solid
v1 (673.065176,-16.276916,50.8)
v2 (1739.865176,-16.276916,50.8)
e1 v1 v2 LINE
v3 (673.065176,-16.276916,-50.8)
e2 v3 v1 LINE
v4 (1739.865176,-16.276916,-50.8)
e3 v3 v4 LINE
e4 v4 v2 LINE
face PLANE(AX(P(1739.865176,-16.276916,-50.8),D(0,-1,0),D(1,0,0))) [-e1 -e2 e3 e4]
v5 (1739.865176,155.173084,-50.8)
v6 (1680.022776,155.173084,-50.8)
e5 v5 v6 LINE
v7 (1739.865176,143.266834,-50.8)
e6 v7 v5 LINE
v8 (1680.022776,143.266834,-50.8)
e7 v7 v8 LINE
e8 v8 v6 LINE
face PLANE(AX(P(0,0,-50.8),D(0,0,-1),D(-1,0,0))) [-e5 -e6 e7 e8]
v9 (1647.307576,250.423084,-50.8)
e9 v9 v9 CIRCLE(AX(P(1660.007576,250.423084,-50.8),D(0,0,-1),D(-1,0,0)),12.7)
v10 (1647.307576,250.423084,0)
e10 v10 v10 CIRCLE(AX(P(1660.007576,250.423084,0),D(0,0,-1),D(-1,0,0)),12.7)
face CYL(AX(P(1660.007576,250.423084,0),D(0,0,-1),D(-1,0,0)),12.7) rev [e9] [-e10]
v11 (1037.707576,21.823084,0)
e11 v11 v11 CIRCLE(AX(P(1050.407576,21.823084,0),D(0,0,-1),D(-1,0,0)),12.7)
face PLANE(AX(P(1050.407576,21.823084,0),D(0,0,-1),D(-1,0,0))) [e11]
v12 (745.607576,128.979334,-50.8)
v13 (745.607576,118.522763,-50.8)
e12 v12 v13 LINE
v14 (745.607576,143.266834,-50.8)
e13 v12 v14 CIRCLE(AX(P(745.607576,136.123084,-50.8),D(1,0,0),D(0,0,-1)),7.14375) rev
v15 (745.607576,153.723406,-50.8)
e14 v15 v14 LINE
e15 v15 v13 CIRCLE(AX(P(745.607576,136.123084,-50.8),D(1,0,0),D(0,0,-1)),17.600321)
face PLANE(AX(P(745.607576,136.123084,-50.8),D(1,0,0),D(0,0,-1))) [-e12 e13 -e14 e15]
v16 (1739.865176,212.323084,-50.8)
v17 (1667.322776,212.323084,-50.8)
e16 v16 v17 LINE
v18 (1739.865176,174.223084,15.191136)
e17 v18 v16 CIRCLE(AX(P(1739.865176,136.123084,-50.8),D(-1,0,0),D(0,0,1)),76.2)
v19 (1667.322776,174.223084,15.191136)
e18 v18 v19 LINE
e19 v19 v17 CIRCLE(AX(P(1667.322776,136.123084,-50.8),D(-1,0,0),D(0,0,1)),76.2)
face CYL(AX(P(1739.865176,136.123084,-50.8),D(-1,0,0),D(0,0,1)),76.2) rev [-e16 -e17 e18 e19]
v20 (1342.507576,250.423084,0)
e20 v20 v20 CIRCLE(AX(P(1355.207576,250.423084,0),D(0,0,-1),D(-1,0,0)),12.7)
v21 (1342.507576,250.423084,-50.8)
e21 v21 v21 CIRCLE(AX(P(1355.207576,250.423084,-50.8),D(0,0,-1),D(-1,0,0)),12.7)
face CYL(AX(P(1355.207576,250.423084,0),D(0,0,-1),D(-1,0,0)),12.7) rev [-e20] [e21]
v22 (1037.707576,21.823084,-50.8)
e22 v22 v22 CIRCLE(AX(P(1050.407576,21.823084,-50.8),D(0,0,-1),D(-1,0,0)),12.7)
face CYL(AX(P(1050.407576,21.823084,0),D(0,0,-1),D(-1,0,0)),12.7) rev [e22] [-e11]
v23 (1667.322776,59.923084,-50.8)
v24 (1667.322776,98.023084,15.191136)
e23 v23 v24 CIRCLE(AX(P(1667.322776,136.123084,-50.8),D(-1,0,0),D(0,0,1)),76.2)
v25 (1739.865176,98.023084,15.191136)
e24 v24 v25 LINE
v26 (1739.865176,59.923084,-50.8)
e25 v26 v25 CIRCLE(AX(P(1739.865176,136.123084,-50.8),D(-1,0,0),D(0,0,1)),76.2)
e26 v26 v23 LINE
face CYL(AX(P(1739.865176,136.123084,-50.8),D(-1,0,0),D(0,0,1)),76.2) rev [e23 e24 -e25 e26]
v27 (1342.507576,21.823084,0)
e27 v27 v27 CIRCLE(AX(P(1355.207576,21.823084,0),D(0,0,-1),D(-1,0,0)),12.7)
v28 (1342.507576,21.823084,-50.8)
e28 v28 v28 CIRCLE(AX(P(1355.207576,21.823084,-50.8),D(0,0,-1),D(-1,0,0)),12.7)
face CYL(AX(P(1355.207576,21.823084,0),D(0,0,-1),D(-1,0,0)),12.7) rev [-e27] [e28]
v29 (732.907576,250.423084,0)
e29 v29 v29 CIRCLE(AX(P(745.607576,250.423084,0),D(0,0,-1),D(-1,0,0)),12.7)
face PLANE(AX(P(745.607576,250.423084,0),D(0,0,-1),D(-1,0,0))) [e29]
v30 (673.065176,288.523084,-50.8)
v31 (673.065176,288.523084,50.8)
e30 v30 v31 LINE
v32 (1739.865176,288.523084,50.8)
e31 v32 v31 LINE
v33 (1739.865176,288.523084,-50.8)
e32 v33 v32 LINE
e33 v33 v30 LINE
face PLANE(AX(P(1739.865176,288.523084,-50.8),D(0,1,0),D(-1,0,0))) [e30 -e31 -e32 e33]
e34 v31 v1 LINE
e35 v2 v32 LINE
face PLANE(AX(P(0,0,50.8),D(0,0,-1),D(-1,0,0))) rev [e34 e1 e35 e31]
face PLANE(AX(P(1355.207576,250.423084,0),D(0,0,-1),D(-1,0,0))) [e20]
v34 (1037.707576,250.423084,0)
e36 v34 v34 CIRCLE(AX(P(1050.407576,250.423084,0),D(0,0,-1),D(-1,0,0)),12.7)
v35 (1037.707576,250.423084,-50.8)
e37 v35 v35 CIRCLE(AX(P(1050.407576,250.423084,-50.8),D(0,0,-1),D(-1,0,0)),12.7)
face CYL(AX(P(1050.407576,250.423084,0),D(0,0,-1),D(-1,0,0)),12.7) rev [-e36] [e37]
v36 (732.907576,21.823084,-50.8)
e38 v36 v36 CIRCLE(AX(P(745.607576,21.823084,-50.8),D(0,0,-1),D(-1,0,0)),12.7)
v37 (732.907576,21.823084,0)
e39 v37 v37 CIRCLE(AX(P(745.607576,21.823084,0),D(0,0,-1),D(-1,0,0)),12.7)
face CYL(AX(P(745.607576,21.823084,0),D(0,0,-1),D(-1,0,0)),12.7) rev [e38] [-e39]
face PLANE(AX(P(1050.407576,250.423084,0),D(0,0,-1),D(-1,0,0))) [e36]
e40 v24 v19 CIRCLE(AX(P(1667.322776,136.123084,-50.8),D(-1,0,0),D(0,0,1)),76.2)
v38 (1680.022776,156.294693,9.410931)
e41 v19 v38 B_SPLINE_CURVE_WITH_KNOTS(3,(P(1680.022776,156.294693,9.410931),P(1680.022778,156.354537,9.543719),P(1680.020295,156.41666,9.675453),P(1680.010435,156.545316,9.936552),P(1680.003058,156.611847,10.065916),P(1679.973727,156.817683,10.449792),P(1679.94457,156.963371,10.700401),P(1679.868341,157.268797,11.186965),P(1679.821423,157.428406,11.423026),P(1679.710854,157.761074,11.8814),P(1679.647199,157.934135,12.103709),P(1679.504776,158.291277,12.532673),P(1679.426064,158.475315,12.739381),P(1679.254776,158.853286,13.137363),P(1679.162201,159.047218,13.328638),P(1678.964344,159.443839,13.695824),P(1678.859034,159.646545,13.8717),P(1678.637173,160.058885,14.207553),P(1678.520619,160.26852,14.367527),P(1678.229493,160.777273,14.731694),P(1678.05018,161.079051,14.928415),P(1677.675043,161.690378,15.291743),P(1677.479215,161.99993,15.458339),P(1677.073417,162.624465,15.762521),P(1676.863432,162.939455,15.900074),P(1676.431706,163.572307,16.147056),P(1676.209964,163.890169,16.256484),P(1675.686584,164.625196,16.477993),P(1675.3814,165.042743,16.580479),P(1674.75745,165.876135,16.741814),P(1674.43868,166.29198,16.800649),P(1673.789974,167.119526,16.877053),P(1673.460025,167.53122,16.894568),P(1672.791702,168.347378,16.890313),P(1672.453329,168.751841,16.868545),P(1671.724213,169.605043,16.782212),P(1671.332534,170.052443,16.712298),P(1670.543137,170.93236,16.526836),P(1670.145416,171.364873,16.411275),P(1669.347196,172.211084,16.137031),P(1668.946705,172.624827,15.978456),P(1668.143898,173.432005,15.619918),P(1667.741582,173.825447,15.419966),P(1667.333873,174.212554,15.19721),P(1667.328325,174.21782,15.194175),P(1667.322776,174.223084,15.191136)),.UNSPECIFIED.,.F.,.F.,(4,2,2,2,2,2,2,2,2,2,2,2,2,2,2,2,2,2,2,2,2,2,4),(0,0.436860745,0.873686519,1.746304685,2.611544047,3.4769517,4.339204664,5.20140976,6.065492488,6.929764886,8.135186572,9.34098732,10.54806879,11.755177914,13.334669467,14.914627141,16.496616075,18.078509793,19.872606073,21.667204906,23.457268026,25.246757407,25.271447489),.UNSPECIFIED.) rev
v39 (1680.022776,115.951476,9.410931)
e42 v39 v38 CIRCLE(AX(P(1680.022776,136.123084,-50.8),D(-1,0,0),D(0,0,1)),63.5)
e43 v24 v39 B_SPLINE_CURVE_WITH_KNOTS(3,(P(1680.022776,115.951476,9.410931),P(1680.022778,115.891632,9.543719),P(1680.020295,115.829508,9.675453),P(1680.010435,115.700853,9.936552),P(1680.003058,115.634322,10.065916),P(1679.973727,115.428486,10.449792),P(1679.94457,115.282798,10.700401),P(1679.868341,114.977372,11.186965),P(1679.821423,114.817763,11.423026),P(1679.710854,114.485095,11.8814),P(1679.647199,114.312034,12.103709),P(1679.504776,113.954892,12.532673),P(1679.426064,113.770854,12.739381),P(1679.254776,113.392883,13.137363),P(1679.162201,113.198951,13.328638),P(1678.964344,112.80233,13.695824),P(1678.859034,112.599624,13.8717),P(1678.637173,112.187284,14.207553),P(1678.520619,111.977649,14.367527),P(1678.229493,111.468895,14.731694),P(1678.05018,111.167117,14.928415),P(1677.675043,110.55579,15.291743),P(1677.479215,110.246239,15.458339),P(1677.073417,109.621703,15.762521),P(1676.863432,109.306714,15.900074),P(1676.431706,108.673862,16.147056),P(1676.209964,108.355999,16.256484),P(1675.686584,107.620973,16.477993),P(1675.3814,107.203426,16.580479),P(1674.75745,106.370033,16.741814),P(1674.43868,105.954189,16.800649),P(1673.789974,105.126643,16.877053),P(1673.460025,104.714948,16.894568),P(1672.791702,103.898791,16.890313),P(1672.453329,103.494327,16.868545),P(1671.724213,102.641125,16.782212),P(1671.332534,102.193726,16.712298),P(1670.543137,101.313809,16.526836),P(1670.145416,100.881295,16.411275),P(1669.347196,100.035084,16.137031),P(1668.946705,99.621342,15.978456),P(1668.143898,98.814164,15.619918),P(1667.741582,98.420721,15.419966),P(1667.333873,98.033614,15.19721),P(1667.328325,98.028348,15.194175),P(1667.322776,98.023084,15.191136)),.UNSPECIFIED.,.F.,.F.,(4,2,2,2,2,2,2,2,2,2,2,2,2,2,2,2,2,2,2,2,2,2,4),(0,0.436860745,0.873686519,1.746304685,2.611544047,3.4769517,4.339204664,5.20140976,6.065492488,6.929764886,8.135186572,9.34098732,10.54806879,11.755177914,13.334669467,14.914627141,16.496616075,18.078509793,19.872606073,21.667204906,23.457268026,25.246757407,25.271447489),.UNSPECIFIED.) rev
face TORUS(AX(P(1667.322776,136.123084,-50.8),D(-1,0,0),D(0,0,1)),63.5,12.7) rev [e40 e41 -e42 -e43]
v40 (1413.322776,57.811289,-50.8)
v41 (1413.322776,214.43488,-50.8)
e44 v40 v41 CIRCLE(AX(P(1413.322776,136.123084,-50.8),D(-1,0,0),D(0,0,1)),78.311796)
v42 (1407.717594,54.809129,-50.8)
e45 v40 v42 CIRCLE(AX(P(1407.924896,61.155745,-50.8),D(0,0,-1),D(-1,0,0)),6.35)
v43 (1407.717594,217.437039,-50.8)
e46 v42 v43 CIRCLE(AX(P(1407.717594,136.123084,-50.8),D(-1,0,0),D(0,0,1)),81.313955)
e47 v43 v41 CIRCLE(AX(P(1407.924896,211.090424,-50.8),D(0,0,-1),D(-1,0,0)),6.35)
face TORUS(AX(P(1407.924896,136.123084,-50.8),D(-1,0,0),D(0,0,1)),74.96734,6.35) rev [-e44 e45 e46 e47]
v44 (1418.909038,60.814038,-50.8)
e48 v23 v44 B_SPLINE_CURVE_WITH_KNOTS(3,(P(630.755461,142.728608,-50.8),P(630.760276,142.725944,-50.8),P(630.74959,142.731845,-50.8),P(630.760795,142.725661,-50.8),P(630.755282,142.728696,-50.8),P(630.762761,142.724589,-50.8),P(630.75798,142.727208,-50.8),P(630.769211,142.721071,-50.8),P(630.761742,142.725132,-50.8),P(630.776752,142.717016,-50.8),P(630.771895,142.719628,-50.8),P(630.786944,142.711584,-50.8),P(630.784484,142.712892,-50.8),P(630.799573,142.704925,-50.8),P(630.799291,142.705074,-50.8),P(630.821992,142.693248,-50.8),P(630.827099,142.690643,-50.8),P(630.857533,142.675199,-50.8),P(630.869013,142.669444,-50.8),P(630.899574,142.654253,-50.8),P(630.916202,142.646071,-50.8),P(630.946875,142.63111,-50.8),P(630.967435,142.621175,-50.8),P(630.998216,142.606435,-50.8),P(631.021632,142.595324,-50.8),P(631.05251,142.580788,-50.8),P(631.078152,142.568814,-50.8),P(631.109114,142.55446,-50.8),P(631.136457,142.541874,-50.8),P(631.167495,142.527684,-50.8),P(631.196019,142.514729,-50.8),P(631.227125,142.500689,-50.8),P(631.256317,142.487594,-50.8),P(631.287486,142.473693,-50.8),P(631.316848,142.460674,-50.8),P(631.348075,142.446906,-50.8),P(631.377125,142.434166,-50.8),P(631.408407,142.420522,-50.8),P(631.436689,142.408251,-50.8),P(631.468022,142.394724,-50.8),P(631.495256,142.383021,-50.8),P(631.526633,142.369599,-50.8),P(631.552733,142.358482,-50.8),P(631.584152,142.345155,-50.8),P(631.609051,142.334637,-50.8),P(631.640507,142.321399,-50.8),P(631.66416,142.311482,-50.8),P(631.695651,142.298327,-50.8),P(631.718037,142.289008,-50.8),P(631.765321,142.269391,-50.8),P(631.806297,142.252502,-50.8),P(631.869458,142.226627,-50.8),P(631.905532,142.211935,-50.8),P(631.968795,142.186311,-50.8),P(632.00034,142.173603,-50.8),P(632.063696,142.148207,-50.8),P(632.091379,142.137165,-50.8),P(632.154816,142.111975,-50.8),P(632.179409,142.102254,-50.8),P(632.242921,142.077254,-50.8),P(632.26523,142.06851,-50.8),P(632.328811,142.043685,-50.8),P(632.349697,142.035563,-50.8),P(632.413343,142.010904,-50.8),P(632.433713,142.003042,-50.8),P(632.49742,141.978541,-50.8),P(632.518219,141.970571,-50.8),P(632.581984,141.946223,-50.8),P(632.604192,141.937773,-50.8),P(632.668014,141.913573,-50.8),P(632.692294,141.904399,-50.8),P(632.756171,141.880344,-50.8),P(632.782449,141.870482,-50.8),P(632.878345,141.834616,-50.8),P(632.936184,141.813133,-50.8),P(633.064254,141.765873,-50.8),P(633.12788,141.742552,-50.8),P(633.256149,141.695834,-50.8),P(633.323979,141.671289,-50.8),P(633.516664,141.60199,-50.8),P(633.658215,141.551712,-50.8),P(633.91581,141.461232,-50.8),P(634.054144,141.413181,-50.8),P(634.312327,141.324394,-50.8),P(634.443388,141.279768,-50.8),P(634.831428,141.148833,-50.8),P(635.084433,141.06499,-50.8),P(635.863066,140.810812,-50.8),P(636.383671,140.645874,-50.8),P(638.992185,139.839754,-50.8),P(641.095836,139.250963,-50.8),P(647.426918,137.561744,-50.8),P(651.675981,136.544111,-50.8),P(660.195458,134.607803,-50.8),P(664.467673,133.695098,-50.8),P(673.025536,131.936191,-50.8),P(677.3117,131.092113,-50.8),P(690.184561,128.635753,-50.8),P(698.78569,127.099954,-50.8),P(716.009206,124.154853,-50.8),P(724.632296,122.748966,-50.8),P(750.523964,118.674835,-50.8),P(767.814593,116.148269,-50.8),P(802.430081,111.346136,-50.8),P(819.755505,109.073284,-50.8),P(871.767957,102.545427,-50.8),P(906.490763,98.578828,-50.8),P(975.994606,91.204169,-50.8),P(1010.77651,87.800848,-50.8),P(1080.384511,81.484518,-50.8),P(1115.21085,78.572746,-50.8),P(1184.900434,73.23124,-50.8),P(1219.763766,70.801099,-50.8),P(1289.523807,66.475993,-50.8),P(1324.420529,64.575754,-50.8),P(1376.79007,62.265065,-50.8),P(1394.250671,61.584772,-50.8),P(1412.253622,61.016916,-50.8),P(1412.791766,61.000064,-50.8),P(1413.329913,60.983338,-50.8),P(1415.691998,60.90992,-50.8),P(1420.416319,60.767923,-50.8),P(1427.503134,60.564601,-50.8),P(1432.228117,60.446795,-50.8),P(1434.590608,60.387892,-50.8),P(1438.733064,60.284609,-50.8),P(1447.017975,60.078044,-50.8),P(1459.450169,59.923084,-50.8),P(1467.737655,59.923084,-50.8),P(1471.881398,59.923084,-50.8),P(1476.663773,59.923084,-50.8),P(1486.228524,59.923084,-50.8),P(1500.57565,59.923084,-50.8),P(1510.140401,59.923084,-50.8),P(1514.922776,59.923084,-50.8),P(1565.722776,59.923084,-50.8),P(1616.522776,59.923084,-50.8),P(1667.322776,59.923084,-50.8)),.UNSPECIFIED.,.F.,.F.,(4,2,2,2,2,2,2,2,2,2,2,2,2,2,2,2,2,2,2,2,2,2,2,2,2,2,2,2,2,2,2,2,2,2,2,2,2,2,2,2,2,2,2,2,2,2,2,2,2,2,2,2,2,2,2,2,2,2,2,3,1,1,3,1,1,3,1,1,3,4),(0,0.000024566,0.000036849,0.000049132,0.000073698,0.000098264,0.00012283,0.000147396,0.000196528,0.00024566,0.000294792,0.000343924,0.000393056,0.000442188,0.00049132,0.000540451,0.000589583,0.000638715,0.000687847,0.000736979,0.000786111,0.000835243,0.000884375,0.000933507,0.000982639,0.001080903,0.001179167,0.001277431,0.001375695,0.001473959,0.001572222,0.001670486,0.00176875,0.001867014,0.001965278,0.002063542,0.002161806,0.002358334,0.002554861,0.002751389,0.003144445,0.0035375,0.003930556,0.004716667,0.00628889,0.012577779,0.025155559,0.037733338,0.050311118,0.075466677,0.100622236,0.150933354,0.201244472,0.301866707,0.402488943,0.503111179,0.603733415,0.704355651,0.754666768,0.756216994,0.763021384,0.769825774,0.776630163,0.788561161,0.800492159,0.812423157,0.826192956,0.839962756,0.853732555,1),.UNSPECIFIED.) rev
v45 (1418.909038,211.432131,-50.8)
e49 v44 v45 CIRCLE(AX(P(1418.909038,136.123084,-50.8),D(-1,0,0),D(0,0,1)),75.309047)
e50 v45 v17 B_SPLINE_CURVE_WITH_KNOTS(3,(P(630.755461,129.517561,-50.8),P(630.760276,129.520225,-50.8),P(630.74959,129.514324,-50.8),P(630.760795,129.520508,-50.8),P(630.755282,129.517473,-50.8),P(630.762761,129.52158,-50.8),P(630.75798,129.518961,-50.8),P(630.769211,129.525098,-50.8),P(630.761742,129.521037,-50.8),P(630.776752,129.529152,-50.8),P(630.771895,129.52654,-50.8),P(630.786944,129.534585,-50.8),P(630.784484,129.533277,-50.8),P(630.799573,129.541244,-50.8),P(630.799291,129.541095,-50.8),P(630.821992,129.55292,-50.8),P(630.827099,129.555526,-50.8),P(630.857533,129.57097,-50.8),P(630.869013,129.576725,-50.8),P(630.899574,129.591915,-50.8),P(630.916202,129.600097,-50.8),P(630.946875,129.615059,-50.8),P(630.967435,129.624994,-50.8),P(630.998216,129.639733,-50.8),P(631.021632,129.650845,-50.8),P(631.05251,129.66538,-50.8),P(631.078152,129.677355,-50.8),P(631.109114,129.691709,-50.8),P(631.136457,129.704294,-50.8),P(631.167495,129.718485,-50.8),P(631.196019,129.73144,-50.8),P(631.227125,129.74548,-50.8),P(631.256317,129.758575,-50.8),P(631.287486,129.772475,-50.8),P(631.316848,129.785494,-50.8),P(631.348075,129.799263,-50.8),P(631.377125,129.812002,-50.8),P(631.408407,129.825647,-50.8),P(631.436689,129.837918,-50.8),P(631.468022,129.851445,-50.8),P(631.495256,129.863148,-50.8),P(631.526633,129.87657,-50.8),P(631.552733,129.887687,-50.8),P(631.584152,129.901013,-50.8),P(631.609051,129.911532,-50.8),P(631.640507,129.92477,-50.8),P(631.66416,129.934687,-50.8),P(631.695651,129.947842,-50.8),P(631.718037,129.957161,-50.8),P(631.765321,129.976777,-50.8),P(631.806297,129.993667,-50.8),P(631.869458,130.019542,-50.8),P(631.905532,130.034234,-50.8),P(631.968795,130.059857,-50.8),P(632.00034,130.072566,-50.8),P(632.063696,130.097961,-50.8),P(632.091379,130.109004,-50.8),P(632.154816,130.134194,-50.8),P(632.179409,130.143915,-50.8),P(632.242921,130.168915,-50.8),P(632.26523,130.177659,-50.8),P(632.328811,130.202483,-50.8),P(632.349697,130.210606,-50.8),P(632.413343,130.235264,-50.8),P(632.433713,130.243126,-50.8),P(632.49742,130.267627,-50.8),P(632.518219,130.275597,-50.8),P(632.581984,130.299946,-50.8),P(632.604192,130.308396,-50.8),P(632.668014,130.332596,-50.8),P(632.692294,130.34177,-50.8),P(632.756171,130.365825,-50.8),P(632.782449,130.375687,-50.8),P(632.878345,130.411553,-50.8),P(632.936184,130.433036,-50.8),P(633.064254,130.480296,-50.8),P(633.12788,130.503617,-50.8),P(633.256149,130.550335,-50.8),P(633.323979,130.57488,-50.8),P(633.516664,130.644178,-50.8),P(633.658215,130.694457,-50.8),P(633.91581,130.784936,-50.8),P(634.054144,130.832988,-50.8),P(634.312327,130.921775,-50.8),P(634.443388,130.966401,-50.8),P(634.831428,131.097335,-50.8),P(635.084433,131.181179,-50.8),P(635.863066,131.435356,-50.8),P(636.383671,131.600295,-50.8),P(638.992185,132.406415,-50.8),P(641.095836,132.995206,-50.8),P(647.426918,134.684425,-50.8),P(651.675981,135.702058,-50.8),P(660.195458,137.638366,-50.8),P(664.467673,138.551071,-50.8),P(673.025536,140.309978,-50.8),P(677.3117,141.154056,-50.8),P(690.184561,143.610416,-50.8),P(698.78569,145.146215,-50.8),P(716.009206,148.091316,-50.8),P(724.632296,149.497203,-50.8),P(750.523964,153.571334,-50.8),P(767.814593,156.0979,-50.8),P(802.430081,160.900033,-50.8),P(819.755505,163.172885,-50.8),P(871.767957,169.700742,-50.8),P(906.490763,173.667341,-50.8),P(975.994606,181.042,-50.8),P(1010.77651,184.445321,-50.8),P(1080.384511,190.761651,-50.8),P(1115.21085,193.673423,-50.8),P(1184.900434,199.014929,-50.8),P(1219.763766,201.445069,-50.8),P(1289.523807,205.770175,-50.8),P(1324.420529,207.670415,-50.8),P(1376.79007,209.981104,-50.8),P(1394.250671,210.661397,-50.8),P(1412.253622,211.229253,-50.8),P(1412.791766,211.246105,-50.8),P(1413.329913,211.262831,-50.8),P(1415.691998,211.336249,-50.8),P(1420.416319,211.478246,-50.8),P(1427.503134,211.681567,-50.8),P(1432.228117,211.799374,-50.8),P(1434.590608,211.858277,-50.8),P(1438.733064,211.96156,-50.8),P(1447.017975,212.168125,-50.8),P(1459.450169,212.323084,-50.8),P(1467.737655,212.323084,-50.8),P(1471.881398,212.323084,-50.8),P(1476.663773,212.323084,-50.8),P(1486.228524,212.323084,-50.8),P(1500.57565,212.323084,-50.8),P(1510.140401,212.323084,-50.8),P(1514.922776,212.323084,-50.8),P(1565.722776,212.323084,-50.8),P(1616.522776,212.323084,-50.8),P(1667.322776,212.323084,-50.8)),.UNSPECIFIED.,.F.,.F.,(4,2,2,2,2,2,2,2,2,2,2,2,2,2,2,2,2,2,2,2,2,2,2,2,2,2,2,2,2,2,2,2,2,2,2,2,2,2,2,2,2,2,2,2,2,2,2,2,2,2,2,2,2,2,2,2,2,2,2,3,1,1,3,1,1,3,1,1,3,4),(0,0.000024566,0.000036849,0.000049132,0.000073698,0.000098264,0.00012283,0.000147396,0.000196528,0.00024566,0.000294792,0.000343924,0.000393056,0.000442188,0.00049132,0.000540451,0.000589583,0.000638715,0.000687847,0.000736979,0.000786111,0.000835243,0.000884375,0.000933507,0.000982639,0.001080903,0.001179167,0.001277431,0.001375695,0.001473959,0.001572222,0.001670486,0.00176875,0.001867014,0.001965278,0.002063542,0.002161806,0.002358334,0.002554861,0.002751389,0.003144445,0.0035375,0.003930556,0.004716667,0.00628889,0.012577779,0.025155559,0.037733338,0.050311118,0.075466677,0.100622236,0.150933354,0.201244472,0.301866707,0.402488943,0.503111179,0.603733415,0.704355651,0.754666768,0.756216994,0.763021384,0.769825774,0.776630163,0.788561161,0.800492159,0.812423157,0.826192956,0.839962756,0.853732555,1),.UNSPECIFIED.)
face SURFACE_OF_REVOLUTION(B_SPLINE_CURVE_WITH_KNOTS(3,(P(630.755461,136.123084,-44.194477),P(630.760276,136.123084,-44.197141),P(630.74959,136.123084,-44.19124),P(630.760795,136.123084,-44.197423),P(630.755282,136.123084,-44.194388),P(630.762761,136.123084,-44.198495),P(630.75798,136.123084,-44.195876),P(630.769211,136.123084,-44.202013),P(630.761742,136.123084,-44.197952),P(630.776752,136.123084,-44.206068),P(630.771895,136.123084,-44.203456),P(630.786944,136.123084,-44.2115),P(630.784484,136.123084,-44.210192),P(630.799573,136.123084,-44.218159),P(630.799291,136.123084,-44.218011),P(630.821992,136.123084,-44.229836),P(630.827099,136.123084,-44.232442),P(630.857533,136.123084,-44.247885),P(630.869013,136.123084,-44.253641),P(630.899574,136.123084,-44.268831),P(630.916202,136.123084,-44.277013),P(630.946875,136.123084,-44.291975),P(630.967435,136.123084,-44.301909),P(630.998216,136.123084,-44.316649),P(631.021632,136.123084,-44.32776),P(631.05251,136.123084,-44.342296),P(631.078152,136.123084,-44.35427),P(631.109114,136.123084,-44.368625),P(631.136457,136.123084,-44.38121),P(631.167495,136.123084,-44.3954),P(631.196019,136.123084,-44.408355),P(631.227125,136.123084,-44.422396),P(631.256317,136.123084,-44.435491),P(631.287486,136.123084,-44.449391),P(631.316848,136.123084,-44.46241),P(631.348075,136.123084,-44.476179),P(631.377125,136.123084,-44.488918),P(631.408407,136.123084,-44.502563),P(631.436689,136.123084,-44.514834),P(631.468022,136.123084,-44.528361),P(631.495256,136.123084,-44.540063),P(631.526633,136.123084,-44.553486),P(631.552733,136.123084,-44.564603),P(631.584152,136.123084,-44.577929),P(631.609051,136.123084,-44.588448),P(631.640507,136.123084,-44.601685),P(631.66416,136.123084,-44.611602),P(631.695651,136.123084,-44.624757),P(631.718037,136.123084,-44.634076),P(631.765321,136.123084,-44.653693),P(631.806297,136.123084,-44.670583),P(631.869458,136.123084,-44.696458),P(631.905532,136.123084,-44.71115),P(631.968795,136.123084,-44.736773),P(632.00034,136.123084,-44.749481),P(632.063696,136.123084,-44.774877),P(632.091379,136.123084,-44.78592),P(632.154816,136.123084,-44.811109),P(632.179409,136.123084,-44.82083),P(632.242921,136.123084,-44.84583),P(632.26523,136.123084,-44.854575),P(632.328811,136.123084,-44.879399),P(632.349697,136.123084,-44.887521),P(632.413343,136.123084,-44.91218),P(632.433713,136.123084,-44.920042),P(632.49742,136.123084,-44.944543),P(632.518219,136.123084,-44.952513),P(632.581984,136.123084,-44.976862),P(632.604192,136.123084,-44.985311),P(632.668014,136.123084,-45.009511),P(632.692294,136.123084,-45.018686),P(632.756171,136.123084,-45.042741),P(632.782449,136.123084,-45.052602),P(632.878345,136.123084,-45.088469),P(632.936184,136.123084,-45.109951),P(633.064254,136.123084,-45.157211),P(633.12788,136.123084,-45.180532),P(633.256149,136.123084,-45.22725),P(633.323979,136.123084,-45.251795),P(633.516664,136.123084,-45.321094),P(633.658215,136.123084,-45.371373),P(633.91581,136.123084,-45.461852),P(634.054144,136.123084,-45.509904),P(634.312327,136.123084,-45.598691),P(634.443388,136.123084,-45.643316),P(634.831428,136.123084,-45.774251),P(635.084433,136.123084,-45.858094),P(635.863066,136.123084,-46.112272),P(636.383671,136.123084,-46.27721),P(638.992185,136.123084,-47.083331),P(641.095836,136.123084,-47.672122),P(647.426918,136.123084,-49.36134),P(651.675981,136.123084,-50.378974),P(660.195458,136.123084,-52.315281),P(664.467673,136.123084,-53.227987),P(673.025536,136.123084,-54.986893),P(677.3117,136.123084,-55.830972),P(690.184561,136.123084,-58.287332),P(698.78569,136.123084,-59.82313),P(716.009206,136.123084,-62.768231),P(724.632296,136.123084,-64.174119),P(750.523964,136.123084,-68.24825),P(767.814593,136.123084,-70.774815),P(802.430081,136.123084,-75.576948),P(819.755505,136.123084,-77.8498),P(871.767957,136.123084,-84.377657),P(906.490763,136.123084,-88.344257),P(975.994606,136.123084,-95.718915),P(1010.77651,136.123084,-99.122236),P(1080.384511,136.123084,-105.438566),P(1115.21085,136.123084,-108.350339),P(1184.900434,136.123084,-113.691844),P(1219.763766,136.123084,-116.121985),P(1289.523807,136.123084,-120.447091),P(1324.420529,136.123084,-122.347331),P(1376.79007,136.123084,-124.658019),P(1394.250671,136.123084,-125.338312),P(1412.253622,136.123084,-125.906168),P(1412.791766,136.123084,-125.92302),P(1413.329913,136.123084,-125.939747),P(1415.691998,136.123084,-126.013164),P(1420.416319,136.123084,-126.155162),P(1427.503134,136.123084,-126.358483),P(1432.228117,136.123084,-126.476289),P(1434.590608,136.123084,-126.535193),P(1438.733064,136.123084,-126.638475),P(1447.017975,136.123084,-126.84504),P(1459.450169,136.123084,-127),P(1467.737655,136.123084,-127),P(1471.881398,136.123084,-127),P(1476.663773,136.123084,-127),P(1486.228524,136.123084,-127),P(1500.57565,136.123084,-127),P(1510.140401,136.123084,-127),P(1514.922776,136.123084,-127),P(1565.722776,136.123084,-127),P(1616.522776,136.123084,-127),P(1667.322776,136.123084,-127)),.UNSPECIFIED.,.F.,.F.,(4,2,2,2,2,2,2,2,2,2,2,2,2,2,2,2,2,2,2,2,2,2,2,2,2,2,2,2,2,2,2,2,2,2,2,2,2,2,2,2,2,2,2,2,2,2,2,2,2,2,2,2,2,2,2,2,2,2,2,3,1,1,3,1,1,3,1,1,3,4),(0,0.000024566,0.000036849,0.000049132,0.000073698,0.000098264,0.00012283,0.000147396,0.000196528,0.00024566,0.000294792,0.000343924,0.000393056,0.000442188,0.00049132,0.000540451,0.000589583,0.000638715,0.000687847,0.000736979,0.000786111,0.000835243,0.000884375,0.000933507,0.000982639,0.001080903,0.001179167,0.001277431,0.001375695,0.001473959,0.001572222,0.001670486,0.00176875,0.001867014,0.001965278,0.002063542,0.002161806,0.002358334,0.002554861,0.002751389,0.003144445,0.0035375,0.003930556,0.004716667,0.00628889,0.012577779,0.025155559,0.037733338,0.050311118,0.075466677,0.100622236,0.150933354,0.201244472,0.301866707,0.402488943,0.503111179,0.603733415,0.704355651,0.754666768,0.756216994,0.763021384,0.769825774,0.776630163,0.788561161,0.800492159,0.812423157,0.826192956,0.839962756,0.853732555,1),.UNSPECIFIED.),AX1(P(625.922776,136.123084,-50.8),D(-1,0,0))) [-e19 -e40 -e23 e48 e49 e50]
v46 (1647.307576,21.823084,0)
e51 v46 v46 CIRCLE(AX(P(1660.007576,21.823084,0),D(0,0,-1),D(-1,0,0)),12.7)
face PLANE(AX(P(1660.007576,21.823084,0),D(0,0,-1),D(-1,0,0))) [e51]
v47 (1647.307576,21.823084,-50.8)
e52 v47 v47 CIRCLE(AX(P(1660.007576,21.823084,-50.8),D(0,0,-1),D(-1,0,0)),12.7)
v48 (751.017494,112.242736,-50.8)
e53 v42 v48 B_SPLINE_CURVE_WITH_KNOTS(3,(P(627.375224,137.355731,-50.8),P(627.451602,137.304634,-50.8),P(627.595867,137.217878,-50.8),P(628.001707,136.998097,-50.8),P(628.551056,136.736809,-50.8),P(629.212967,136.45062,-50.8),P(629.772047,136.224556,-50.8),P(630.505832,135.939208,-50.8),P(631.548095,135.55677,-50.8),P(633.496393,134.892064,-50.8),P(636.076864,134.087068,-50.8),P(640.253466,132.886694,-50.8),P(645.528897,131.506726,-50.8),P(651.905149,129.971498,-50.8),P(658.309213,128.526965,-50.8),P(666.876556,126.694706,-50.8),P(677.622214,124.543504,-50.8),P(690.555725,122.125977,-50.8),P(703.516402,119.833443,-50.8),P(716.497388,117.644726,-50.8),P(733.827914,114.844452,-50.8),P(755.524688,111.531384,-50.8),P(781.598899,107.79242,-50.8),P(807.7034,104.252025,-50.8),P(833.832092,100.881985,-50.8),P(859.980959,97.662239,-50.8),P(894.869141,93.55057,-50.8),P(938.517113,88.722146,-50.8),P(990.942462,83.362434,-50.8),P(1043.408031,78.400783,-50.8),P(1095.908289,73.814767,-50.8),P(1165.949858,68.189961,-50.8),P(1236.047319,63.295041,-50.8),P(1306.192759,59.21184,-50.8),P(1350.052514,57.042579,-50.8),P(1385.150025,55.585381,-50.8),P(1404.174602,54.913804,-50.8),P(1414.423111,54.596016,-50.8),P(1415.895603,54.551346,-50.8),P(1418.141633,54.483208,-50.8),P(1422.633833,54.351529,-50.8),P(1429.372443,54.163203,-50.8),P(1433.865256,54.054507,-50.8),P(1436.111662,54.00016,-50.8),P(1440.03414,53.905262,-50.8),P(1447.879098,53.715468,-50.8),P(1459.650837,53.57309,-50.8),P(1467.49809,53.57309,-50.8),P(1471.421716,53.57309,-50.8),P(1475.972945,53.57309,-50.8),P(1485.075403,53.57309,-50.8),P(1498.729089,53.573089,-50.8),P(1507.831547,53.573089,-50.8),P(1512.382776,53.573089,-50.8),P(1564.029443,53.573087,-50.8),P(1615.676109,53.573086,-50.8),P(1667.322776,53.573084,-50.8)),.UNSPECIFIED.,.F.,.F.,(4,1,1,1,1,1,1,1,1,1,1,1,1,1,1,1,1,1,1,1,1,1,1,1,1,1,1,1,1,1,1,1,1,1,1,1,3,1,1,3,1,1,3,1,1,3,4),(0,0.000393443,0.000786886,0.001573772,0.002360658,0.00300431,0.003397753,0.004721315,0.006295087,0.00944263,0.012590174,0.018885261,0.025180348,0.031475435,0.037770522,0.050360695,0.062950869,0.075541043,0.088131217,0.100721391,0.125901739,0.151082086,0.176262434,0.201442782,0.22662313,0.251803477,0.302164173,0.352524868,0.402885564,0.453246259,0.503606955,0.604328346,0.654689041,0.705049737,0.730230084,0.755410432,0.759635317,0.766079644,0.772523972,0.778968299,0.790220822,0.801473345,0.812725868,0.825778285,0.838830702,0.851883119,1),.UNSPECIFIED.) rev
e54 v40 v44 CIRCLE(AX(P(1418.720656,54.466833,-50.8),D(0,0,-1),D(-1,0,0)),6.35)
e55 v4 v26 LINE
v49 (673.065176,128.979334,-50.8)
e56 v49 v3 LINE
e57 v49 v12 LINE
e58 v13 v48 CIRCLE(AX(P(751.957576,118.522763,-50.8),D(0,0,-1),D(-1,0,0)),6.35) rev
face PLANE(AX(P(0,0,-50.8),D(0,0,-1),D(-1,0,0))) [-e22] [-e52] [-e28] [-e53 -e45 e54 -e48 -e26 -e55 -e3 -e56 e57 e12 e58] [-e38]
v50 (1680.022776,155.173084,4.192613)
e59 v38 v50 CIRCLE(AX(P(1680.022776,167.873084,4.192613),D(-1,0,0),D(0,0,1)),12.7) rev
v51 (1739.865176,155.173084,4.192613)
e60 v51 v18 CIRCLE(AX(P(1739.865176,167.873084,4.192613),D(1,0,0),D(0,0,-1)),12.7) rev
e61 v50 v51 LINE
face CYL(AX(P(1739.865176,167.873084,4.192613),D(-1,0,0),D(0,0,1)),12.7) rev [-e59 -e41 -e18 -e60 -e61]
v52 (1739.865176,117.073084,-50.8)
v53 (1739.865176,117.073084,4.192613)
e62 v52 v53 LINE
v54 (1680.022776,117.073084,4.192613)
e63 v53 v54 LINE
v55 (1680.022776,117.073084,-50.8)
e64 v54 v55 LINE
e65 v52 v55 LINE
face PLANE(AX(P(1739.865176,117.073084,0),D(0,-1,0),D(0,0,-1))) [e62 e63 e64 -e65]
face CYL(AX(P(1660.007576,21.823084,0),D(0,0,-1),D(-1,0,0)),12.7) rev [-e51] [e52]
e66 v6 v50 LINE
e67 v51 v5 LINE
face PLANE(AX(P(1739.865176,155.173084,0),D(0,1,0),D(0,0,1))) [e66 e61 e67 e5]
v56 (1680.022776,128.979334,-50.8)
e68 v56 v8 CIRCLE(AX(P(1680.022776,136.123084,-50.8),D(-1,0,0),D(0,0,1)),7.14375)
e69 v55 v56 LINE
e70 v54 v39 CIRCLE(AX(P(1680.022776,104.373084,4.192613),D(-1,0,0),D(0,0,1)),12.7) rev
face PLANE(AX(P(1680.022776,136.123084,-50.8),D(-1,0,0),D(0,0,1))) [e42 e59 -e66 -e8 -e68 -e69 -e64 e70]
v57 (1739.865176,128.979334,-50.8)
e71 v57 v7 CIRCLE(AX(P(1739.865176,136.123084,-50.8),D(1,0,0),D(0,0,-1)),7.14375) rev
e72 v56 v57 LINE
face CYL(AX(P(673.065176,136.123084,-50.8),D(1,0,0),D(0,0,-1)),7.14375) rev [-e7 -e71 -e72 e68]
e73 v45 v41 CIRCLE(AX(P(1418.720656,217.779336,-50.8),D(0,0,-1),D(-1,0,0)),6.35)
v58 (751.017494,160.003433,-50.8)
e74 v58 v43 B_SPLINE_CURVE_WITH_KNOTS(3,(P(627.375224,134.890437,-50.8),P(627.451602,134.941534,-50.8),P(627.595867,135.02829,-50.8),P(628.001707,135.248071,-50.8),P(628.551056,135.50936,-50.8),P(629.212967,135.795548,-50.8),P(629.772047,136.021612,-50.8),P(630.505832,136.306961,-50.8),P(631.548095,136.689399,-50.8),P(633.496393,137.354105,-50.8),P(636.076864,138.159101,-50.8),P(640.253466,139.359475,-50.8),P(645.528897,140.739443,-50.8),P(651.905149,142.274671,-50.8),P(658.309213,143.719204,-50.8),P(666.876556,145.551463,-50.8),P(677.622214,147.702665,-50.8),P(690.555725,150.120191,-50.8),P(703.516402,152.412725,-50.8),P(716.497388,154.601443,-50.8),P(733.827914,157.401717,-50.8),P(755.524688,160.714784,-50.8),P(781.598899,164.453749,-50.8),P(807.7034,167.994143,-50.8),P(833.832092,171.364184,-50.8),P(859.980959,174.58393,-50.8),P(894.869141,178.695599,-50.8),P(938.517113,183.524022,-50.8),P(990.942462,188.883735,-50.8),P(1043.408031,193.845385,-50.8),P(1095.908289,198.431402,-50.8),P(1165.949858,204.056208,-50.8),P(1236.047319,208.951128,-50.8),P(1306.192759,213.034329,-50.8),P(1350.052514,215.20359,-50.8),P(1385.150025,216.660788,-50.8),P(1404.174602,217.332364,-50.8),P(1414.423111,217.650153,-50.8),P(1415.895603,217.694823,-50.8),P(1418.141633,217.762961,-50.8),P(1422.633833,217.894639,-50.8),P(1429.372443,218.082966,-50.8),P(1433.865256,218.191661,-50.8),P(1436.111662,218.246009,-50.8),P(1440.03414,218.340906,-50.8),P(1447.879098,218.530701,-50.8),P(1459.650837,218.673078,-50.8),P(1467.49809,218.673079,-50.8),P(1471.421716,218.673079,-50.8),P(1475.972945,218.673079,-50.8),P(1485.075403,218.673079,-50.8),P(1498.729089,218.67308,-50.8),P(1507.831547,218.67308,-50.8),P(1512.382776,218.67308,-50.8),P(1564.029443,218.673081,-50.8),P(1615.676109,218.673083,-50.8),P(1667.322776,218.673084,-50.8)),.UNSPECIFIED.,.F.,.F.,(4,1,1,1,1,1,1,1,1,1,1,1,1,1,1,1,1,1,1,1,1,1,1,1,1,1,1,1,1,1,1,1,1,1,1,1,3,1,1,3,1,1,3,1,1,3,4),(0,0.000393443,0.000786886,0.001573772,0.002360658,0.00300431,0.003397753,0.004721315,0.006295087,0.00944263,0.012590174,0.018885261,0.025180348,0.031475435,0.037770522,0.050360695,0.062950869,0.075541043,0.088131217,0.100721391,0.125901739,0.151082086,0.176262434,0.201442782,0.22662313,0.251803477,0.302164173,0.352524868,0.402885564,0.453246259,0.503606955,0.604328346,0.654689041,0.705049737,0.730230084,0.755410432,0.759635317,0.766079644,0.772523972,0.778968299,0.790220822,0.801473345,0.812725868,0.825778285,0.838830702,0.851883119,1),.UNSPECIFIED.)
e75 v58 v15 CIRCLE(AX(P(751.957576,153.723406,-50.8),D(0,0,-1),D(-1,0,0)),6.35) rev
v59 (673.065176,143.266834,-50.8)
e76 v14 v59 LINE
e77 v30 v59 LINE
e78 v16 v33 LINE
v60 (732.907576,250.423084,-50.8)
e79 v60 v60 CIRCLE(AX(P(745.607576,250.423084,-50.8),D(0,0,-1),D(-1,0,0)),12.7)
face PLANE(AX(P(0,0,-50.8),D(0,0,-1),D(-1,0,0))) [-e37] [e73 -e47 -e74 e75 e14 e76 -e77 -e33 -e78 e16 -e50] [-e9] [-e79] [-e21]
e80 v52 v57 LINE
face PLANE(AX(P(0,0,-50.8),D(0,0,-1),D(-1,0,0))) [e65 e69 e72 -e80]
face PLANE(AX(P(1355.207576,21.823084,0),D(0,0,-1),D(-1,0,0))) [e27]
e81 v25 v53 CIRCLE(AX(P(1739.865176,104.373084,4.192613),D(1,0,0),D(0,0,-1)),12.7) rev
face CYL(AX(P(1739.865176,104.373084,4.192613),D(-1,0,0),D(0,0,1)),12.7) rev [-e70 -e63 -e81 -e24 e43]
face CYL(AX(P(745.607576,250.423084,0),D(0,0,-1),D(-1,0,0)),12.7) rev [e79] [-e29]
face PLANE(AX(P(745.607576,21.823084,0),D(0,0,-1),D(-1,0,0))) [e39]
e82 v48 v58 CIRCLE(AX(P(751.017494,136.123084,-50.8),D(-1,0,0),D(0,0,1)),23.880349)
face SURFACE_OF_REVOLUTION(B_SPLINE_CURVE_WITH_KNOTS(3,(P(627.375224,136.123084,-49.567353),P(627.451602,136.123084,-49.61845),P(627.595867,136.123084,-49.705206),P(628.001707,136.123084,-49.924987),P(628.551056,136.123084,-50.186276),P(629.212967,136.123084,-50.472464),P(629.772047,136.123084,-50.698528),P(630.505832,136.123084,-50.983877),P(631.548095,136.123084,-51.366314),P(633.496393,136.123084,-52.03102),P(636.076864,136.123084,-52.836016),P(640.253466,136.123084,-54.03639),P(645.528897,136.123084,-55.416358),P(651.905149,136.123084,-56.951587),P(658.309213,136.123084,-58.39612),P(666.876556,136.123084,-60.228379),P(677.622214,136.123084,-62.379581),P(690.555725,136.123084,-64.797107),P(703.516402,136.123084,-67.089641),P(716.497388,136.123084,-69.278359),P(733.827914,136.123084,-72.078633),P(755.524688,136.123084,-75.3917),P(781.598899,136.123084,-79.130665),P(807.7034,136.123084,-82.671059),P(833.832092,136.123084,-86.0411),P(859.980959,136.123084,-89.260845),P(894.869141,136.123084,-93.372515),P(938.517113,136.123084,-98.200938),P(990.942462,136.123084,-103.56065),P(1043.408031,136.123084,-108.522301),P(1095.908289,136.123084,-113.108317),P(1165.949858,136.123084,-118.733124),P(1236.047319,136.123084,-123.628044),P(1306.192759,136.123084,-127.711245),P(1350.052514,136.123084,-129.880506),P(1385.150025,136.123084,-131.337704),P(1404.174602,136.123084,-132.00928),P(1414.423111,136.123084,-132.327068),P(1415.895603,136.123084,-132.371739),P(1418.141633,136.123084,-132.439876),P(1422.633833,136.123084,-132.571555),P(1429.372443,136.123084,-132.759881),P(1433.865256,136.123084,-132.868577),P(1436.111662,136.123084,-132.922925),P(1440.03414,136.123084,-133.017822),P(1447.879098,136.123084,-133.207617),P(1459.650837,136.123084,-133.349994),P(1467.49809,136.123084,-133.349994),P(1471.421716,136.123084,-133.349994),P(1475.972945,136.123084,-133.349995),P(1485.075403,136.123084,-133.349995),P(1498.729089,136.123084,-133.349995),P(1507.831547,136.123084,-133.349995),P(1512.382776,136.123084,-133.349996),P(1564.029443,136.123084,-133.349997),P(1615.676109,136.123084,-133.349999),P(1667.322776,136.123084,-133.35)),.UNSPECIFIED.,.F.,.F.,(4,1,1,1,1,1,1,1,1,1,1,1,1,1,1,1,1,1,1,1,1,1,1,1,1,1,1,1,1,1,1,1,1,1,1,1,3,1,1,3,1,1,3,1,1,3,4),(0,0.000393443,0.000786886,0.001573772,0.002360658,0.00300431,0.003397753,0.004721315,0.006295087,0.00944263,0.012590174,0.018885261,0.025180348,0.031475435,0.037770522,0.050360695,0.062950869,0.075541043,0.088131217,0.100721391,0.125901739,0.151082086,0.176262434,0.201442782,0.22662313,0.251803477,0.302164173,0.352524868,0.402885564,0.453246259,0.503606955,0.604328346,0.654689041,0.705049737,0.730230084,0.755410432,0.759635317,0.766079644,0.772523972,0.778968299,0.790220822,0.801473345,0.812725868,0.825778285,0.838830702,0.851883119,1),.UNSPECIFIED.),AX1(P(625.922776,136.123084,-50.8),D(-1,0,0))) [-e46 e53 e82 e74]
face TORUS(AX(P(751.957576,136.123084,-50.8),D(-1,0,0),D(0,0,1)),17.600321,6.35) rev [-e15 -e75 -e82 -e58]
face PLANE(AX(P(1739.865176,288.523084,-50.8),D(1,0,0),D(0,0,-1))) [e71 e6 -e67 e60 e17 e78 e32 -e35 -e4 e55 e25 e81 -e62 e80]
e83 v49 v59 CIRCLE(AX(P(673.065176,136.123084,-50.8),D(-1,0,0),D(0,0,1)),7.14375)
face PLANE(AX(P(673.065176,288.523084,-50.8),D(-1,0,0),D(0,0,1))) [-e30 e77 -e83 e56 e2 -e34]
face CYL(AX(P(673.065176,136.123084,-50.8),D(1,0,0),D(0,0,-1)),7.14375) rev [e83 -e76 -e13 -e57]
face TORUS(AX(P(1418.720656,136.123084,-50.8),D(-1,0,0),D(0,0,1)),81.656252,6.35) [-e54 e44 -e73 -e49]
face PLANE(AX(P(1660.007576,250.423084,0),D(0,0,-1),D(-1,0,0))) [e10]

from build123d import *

# Parameters (mm, degrees)
SKETCH2_W                    = 1066.8
SKETCH2_H                    = 304.8
BOSS_EXTRUDE1_DEPTH          = 50.8
CUT_EXTRUDE1_DEPTH           = 1107.294920223
CUT_EXTRUDE1_DEPTH_BACK      = 1107.294920223
SKETCH4_R                    = 7.14375
CUT_EXTRUDE3_DEPTH           = 1037.520325732
FILLET4_R                    = 6.35
REGISTRATION_HOLE_SKETCH_R   = 12.7
BASE_REGISTRATION_HOLE_DEPTH = 50.8
LPATTERN3_COUNT              = 4
LPATTERN3_PITCH              = 304.8
LPATTERN3_COUNT_DIR2         = 2
LPATTERN3_PITCH_DIR2         = 228.6
SKETCH7_R                    = 76.2
CUT_EXTRUDE4_DEPTH           = 12.7
FILLET5_R                    = 12.7


# Read off the part's stored shape, not the designer's step: Indent1
with BuildPart() as part:
    # Sketch2 → Boss-Extrude1 (new, symmetric)
    with BuildSketch(Plane.XY):
        with Locations((1206.465176028, 136.123084384)):
            Rectangle(SKETCH2_W, SKETCH2_H)
    extrude(amount=BOSS_EXTRUDE1_DEPTH, both=True)

    # Indent1 outline → Indent1 (revolve, cut)
    with BuildSketch(Plane(origin=(0, 136.123084384, -50.8), x_dir=(0, 1, 0), z_dir=(0, 0, -1))):
        with BuildLine():
            Line((76.2, 1667.322776028), (0, 1667.322776028))
            Line((0, 1667.322776028), (0, 745.607576028))
            Line((0, 745.607576028), (23.064945381, 745.607576028))
            add(Edge.make_bspline(
                [(23.064945381, 745.607576028), (23.566825523, 748.91437787), (25.363204219, 760.90488429), (28.330664868, 781.598898763), (31.871058885, 807.703400336), (35.241099853, 833.832092117), (38.460845457, 859.980959498), (42.572514827, 894.869141414), (47.400937928, 938.517112788), (52.760650205, 990.942462001), (57.722301111, 1043.408031291), (62.308317352, 1095.908289185), (67.933123727, 1165.949858053), (72.828043506, 1236.047318759), (76.911244662, 1306.192759412), (79.080505646, 1350.052513699), (80.485669281, 1383.896744518), (81.068244998, 1400.195093482), (81.313954963, 1407.717593946)],
                knots=[0.116308657, 0.116308657, 0.116308657, 0.116308657, 0.125901739, 0.151082086, 0.176262434, 0.201442782, 0.22662313, 0.251803477, 0.302164173, 0.352524868, 0.402885564, 0.453246259, 0.503606955, 0.604328346, 0.654689041, 0.705049737, 0.730230084, 0.75181382, 0.75181382, 0.75181382, 0.75181382], degree=3))
            ThreePointArc((81.313954963, 1407.717593946), (80.564993874, 1410.923022844), (78.31179575, 1413.322776028))
            ThreePointArc((78.31179575, 1413.322776028), (76.063072477, 1415.714189378), (75.309046779, 1418.909038266))
            add(Edge.make_bspline(
                [(75.309046779, 1418.909038266), (75.323959024, 1419.411481069), (75.408519742, 1422.276130669), (75.558482998, 1427.503133809), (75.676289458, 1432.228116929), (75.735192688, 1434.590608489), (75.838475179, 1438.733064052), (76.045040161, 1447.017975177), (76.2, 1459.45016933), (76.2, 1467.737655163), (76.2, 1471.88139808), (76.2, 1476.663773407), (76.2, 1486.228524062), (76.2, 1500.575650045), (76.2, 1510.1404007), (76.2, 1514.922776028), (76.2, 1565.722776028), (76.2, 1616.522776028), (76.2, 1667.322776028)],
                knots=[0.761574077, 0.761574077, 0.761574077, 0.761574077, 0.763021384, 0.769825774, 0.776630163, 0.776630163, 0.776630163, 0.788561161, 0.800492159, 0.812423157, 0.812423157, 0.812423157, 0.826192956, 0.839962756, 0.853732555, 0.853732555, 0.853732555, 1, 1, 1, 1], degree=3))
        make_face()
    revolve(axis=Axis((0, 136.123084384, -50.8), (1, 0, 0)), mode=Mode.SUBTRACT)

    # Sketch4 → Cut-Extrude1 (cut, two sides: drawn at the far end of the back side and taken through both)
    with BuildSketch(Plane.ZY.offset(-1739.865176028).offset(-CUT_EXTRUDE1_DEPTH_BACK)):
        with Locations((-50.8, 136.123084384)):
            Circle(SKETCH4_R)
    extrude(amount=CUT_EXTRUDE1_DEPTH + CUT_EXTRUDE1_DEPTH_BACK, mode=Mode.SUBTRACT)

    # Sketch6 → Cut-Extrude3 (cut, through all)
    with BuildSketch(Plane.ZY.offset(-1667.322776028)):
        with BuildLine():
            Line((22.980332745, 117.073084384), (-50.8, 117.073084384))
            Line((-50.8, 117.073084384), (-50.8, 59.923084384))
            ThreePointArc((-50.8, 59.923084384), (-4.1372204, 75.881694958), (22.980332745, 117.073084384))
        make_face()
        with BuildLine():
            Line((-50.8, 155.173084384), (22.980332745, 155.173084384))
            ThreePointArc((22.980332745, 155.173084384), (-4.1372204, 196.364473811), (-50.8, 212.323084384))
            Line((-50.8, 212.323084384), (-50.8, 199.623084384))
            Line((-50.8, 199.623084384), (-50.8, 155.173084384))
        make_face()
    extrude(amount=-CUT_EXTRUDE3_DEPTH, mode=Mode.SUBTRACT)

    # Fillet4
    fillet4_edges = [part.edges().sort_by_distance(p)[0] for p in [
        (745.607576028, 136.123084384, -27.735054619),
    ]]
    fillet(fillet4_edges, radius=FILLET4_R)

    # Registration Hole Sketch → Base-Registration-Hole (cut)
    with BuildSketch(Plane(origin=(0, 0, -50.8), x_dir=(-1, 0, 0), z_dir=(0, 0, -1))):
        with Locations((-745.607576028, 21.823084384)):
            Circle(REGISTRATION_HOLE_SKETCH_R)
    base_registration_hole = extrude(amount=-BASE_REGISTRATION_HOLE_DEPTH, mode=Mode.SUBTRACT)

    # LPattern3: Base-Registration-Hole 4 × 2
    with Locations(*[(i * LPATTERN3_PITCH, j * LPATTERN3_PITCH_DIR2, 0) for i in range(LPATTERN3_COUNT) for j in range(LPATTERN3_COUNT_DIR2) if (i, j) != (0, 0)]):
        add(base_registration_hole, mode=Mode.SUBTRACT)

    # Sketch7 → Cut-Extrude4 (cut)
    with BuildSketch(Plane.ZY.offset(-1667.322776028)):
        with Locations((-50.8, 136.123084384)):
            Circle(SKETCH7_R)
    extrude(amount=-CUT_EXTRUDE4_DEPTH, mode=Mode.SUBTRACT)

    # Fillet5
    # the kernel refuses this fillet: 12.7 mm, written as the material it adds along each edge
    with BuildSketch(Plane(origin=(1680.022776028, 136.123084384, -50.8), x_dir=(0, -0.6204773534699832, 0.7842243644716003), z_dir=(0, -0.7842243644716003, -0.6204773534699832))) as fillet5_piece_1_section:
        with BuildLine():
            CenterArc((76.2 - FILLET5_R, FILLET5_R), FILLET5_R, 270, 90)
            Line((76.2 - FILLET5_R, 0), (76.2, 0))
            Line((76.2, 0), (76.2, FILLET5_R))
        make_face()
    fillet5_piece_1 = revolve(axis=Axis((1680.022776028, 136.123084384, -50.8), (-1, 0, 0)), revolution_arc=38.351001738, mode=Mode.PRIVATE)
    fillet5_piece_1 = split(fillet5_piece_1, bisect_by=Plane(origin=(1677.149054572, 117.073084384, 21.679553224), z_dir=(0, 1, 0)), keep=Keep.TOP, mode=Mode.PRIVATE)
    add(fillet5_piece_1)
    with BuildSketch(Plane(origin=(1680.022776028, 117.073084384, 22.980332745), x_dir=(0, -0.9256147934109615, -0.37846697903355186), z_dir=(1, 0, 0))) as fillet5_piece_2:
        with BuildLine():
            CenterArc((18.865839358, 12.583660567), FILLET5_R, 157.761243907, 120)
            Line((7.110531482, 17.390191201), (0, 0))
            ThreePointArc((0, 0), (10.290457832, -0.698036598), (20.580915663, 0))
        make_face()
    extrude(amount=59.8424)
    with BuildSketch(Plane(origin=(1680.022776028, 155.173084384, 22.980332745), x_dir=(0, 0, -1), z_dir=(1, 0, 0))) as fillet5_piece_3:
        with BuildLine():
            CenterArc((18.787719605, 12.7), FILLET5_R, 150, 120)
            ThreePointArc((7.789196977, 19.05), (3.248485487, 9.789183802), (0, 0))
            Line((0, 0), (18.787719605, 0))
        make_face()
    extrude(amount=59.8424)
    with BuildSketch(Plane(origin=(1680.022776028, 136.123084384, -50.8), x_dir=(0, 0, 1), z_dir=(0, -1, 0))) as fillet5_piece_4_section:
        with BuildLine():
            CenterArc((76.2 - FILLET5_R, FILLET5_R), FILLET5_R, 270, 90)
            Line((76.2, FILLET5_R), (76.2, 0))
            Line((76.2, 0), (76.2 - FILLET5_R, 0))
        make_face()
    fillet5_piece_4 = revolve(axis=Axis((1680.022776028, 136.123084384, -50.8), (-1, 0, 0)), revolution_arc=38.351001738, mode=Mode.PRIVATE)
    fillet5_piece_4 = split(fillet5_piece_4, bisect_by=Plane(origin=(1677.14905497, 155.173084384, 21.679553319), z_dir=(0, -1, 0)), keep=Keep.TOP, mode=Mode.PRIVATE)
    add(fillet5_piece_4)
    with BuildSketch(Plane(origin=(1628.570486869, 117.073084384, 22.980332745), x_dir=(0, -0.9256147934109611, -0.378466979033553), z_dir=(1, 0, 0))) as fillet5_piece_5a_section:
        with BuildLine():
            CenterArc((18.865839358, 12.583660567), FILLET5_R, 157.761243907, 120)
            Line((7.110531482, 17.390191201), (0, 0))
            ThreePointArc((0, 0), (10.290457832, -0.698036598), (20.580915663, 0))
        make_face()
    fillet5_piece_5a = extrude(amount=111.294689159, mode=Mode.PRIVATE)
    fillet5_piece_5a = split(fillet5_piece_5a, bisect_by=Plane(origin=(1680.022776028, 112.40455017, 17.056705553), z_dir=(-1, 0, 0)), keep=Keep.TOP, mode=Mode.PRIVATE)
    with BuildSketch(Plane(origin=(1680.022776028, 136.123084384, -50.8), x_dir=(0, -0.6204773534699832, 0.7842243644716003), z_dir=(0, -0.7842243644716003, -0.6204773534699832))) as fillet5_piece_5b_section:
        with BuildLine():
            CenterArc((76.2 - FILLET5_R, FILLET5_R), FILLET5_R, 270, 90)
            Line((76.2 - FILLET5_R, 0), (76.2, 0))
            Line((76.2, 0), (76.2, FILLET5_R))
        make_face()
    fillet5_piece_5b = revolve(axis=Axis((1680.022776028, 136.123084384, -50.8), (-1, 0, 0)), revolution_arc=38.351001738, mode=Mode.PRIVATE)
    fillet5_piece_5b = split(fillet5_piece_5b, bisect_by=Plane(origin=(1677.047146673, 117.073084384, 14.411791174), z_dir=(0, -1, 0)), keep=Keep.TOP, mode=Mode.PRIVATE)
    fillet5_piece_5 = fillet5_piece_5a & fillet5_piece_5b
    add(fillet5_piece_5)
    with BuildSketch(Plane(origin=(1680.022776028, 136.123084384, -50.8), x_dir=(0, 0, 1), z_dir=(0, -1, 0))) as fillet5_piece_6a_section:
        with BuildLine():
            CenterArc((76.2 - FILLET5_R, FILLET5_R), FILLET5_R, 270, 90)
            Line((76.2, FILLET5_R), (76.2, 0))
            Line((76.2, 0), (76.2 - FILLET5_R, 0))
        make_face()
    fillet5_piece_6a = revolve(axis=Axis((1680.022776028, 136.123084384, -50.8), (-1, 0, 0)), revolution_arc=38.351001738, mode=Mode.PRIVATE)
    fillet5_piece_6a = split(fillet5_piece_6a, bisect_by=Plane(origin=(1677.047146631, 155.173084384, 14.41179131), z_dir=(0, 1, 0)), keep=Keep.TOP, mode=Mode.PRIVATE)
    with BuildSketch(Plane(origin=(1628.570486869, 155.173084384, 22.980332745), x_dir=(0, 0, -1), z_dir=(1, 0, 0))) as fillet5_piece_6b_section:
        with BuildLine():
            CenterArc((18.787719605, 12.7), FILLET5_R, 150, 120)
            ThreePointArc((7.789196977, 19.05), (3.248485487, 9.789183802), (0, 0))
            Line((0, 0), (18.787719605, 0))
        make_face()
    fillet5_piece_6b = extrude(amount=111.294689159, mode=Mode.PRIVATE)
    fillet5_piece_6b = split(fillet5_piece_6b, bisect_by=Plane(origin=(1680.022776028, 159.841618598, 17.056705553), z_dir=(-1, 0, 0)), keep=Keep.TOP, mode=Mode.PRIVATE)
    fillet5_piece_6 = fillet5_piece_6a & fillet5_piece_6b
    add(fillet5_piece_6)


solid = part.part
